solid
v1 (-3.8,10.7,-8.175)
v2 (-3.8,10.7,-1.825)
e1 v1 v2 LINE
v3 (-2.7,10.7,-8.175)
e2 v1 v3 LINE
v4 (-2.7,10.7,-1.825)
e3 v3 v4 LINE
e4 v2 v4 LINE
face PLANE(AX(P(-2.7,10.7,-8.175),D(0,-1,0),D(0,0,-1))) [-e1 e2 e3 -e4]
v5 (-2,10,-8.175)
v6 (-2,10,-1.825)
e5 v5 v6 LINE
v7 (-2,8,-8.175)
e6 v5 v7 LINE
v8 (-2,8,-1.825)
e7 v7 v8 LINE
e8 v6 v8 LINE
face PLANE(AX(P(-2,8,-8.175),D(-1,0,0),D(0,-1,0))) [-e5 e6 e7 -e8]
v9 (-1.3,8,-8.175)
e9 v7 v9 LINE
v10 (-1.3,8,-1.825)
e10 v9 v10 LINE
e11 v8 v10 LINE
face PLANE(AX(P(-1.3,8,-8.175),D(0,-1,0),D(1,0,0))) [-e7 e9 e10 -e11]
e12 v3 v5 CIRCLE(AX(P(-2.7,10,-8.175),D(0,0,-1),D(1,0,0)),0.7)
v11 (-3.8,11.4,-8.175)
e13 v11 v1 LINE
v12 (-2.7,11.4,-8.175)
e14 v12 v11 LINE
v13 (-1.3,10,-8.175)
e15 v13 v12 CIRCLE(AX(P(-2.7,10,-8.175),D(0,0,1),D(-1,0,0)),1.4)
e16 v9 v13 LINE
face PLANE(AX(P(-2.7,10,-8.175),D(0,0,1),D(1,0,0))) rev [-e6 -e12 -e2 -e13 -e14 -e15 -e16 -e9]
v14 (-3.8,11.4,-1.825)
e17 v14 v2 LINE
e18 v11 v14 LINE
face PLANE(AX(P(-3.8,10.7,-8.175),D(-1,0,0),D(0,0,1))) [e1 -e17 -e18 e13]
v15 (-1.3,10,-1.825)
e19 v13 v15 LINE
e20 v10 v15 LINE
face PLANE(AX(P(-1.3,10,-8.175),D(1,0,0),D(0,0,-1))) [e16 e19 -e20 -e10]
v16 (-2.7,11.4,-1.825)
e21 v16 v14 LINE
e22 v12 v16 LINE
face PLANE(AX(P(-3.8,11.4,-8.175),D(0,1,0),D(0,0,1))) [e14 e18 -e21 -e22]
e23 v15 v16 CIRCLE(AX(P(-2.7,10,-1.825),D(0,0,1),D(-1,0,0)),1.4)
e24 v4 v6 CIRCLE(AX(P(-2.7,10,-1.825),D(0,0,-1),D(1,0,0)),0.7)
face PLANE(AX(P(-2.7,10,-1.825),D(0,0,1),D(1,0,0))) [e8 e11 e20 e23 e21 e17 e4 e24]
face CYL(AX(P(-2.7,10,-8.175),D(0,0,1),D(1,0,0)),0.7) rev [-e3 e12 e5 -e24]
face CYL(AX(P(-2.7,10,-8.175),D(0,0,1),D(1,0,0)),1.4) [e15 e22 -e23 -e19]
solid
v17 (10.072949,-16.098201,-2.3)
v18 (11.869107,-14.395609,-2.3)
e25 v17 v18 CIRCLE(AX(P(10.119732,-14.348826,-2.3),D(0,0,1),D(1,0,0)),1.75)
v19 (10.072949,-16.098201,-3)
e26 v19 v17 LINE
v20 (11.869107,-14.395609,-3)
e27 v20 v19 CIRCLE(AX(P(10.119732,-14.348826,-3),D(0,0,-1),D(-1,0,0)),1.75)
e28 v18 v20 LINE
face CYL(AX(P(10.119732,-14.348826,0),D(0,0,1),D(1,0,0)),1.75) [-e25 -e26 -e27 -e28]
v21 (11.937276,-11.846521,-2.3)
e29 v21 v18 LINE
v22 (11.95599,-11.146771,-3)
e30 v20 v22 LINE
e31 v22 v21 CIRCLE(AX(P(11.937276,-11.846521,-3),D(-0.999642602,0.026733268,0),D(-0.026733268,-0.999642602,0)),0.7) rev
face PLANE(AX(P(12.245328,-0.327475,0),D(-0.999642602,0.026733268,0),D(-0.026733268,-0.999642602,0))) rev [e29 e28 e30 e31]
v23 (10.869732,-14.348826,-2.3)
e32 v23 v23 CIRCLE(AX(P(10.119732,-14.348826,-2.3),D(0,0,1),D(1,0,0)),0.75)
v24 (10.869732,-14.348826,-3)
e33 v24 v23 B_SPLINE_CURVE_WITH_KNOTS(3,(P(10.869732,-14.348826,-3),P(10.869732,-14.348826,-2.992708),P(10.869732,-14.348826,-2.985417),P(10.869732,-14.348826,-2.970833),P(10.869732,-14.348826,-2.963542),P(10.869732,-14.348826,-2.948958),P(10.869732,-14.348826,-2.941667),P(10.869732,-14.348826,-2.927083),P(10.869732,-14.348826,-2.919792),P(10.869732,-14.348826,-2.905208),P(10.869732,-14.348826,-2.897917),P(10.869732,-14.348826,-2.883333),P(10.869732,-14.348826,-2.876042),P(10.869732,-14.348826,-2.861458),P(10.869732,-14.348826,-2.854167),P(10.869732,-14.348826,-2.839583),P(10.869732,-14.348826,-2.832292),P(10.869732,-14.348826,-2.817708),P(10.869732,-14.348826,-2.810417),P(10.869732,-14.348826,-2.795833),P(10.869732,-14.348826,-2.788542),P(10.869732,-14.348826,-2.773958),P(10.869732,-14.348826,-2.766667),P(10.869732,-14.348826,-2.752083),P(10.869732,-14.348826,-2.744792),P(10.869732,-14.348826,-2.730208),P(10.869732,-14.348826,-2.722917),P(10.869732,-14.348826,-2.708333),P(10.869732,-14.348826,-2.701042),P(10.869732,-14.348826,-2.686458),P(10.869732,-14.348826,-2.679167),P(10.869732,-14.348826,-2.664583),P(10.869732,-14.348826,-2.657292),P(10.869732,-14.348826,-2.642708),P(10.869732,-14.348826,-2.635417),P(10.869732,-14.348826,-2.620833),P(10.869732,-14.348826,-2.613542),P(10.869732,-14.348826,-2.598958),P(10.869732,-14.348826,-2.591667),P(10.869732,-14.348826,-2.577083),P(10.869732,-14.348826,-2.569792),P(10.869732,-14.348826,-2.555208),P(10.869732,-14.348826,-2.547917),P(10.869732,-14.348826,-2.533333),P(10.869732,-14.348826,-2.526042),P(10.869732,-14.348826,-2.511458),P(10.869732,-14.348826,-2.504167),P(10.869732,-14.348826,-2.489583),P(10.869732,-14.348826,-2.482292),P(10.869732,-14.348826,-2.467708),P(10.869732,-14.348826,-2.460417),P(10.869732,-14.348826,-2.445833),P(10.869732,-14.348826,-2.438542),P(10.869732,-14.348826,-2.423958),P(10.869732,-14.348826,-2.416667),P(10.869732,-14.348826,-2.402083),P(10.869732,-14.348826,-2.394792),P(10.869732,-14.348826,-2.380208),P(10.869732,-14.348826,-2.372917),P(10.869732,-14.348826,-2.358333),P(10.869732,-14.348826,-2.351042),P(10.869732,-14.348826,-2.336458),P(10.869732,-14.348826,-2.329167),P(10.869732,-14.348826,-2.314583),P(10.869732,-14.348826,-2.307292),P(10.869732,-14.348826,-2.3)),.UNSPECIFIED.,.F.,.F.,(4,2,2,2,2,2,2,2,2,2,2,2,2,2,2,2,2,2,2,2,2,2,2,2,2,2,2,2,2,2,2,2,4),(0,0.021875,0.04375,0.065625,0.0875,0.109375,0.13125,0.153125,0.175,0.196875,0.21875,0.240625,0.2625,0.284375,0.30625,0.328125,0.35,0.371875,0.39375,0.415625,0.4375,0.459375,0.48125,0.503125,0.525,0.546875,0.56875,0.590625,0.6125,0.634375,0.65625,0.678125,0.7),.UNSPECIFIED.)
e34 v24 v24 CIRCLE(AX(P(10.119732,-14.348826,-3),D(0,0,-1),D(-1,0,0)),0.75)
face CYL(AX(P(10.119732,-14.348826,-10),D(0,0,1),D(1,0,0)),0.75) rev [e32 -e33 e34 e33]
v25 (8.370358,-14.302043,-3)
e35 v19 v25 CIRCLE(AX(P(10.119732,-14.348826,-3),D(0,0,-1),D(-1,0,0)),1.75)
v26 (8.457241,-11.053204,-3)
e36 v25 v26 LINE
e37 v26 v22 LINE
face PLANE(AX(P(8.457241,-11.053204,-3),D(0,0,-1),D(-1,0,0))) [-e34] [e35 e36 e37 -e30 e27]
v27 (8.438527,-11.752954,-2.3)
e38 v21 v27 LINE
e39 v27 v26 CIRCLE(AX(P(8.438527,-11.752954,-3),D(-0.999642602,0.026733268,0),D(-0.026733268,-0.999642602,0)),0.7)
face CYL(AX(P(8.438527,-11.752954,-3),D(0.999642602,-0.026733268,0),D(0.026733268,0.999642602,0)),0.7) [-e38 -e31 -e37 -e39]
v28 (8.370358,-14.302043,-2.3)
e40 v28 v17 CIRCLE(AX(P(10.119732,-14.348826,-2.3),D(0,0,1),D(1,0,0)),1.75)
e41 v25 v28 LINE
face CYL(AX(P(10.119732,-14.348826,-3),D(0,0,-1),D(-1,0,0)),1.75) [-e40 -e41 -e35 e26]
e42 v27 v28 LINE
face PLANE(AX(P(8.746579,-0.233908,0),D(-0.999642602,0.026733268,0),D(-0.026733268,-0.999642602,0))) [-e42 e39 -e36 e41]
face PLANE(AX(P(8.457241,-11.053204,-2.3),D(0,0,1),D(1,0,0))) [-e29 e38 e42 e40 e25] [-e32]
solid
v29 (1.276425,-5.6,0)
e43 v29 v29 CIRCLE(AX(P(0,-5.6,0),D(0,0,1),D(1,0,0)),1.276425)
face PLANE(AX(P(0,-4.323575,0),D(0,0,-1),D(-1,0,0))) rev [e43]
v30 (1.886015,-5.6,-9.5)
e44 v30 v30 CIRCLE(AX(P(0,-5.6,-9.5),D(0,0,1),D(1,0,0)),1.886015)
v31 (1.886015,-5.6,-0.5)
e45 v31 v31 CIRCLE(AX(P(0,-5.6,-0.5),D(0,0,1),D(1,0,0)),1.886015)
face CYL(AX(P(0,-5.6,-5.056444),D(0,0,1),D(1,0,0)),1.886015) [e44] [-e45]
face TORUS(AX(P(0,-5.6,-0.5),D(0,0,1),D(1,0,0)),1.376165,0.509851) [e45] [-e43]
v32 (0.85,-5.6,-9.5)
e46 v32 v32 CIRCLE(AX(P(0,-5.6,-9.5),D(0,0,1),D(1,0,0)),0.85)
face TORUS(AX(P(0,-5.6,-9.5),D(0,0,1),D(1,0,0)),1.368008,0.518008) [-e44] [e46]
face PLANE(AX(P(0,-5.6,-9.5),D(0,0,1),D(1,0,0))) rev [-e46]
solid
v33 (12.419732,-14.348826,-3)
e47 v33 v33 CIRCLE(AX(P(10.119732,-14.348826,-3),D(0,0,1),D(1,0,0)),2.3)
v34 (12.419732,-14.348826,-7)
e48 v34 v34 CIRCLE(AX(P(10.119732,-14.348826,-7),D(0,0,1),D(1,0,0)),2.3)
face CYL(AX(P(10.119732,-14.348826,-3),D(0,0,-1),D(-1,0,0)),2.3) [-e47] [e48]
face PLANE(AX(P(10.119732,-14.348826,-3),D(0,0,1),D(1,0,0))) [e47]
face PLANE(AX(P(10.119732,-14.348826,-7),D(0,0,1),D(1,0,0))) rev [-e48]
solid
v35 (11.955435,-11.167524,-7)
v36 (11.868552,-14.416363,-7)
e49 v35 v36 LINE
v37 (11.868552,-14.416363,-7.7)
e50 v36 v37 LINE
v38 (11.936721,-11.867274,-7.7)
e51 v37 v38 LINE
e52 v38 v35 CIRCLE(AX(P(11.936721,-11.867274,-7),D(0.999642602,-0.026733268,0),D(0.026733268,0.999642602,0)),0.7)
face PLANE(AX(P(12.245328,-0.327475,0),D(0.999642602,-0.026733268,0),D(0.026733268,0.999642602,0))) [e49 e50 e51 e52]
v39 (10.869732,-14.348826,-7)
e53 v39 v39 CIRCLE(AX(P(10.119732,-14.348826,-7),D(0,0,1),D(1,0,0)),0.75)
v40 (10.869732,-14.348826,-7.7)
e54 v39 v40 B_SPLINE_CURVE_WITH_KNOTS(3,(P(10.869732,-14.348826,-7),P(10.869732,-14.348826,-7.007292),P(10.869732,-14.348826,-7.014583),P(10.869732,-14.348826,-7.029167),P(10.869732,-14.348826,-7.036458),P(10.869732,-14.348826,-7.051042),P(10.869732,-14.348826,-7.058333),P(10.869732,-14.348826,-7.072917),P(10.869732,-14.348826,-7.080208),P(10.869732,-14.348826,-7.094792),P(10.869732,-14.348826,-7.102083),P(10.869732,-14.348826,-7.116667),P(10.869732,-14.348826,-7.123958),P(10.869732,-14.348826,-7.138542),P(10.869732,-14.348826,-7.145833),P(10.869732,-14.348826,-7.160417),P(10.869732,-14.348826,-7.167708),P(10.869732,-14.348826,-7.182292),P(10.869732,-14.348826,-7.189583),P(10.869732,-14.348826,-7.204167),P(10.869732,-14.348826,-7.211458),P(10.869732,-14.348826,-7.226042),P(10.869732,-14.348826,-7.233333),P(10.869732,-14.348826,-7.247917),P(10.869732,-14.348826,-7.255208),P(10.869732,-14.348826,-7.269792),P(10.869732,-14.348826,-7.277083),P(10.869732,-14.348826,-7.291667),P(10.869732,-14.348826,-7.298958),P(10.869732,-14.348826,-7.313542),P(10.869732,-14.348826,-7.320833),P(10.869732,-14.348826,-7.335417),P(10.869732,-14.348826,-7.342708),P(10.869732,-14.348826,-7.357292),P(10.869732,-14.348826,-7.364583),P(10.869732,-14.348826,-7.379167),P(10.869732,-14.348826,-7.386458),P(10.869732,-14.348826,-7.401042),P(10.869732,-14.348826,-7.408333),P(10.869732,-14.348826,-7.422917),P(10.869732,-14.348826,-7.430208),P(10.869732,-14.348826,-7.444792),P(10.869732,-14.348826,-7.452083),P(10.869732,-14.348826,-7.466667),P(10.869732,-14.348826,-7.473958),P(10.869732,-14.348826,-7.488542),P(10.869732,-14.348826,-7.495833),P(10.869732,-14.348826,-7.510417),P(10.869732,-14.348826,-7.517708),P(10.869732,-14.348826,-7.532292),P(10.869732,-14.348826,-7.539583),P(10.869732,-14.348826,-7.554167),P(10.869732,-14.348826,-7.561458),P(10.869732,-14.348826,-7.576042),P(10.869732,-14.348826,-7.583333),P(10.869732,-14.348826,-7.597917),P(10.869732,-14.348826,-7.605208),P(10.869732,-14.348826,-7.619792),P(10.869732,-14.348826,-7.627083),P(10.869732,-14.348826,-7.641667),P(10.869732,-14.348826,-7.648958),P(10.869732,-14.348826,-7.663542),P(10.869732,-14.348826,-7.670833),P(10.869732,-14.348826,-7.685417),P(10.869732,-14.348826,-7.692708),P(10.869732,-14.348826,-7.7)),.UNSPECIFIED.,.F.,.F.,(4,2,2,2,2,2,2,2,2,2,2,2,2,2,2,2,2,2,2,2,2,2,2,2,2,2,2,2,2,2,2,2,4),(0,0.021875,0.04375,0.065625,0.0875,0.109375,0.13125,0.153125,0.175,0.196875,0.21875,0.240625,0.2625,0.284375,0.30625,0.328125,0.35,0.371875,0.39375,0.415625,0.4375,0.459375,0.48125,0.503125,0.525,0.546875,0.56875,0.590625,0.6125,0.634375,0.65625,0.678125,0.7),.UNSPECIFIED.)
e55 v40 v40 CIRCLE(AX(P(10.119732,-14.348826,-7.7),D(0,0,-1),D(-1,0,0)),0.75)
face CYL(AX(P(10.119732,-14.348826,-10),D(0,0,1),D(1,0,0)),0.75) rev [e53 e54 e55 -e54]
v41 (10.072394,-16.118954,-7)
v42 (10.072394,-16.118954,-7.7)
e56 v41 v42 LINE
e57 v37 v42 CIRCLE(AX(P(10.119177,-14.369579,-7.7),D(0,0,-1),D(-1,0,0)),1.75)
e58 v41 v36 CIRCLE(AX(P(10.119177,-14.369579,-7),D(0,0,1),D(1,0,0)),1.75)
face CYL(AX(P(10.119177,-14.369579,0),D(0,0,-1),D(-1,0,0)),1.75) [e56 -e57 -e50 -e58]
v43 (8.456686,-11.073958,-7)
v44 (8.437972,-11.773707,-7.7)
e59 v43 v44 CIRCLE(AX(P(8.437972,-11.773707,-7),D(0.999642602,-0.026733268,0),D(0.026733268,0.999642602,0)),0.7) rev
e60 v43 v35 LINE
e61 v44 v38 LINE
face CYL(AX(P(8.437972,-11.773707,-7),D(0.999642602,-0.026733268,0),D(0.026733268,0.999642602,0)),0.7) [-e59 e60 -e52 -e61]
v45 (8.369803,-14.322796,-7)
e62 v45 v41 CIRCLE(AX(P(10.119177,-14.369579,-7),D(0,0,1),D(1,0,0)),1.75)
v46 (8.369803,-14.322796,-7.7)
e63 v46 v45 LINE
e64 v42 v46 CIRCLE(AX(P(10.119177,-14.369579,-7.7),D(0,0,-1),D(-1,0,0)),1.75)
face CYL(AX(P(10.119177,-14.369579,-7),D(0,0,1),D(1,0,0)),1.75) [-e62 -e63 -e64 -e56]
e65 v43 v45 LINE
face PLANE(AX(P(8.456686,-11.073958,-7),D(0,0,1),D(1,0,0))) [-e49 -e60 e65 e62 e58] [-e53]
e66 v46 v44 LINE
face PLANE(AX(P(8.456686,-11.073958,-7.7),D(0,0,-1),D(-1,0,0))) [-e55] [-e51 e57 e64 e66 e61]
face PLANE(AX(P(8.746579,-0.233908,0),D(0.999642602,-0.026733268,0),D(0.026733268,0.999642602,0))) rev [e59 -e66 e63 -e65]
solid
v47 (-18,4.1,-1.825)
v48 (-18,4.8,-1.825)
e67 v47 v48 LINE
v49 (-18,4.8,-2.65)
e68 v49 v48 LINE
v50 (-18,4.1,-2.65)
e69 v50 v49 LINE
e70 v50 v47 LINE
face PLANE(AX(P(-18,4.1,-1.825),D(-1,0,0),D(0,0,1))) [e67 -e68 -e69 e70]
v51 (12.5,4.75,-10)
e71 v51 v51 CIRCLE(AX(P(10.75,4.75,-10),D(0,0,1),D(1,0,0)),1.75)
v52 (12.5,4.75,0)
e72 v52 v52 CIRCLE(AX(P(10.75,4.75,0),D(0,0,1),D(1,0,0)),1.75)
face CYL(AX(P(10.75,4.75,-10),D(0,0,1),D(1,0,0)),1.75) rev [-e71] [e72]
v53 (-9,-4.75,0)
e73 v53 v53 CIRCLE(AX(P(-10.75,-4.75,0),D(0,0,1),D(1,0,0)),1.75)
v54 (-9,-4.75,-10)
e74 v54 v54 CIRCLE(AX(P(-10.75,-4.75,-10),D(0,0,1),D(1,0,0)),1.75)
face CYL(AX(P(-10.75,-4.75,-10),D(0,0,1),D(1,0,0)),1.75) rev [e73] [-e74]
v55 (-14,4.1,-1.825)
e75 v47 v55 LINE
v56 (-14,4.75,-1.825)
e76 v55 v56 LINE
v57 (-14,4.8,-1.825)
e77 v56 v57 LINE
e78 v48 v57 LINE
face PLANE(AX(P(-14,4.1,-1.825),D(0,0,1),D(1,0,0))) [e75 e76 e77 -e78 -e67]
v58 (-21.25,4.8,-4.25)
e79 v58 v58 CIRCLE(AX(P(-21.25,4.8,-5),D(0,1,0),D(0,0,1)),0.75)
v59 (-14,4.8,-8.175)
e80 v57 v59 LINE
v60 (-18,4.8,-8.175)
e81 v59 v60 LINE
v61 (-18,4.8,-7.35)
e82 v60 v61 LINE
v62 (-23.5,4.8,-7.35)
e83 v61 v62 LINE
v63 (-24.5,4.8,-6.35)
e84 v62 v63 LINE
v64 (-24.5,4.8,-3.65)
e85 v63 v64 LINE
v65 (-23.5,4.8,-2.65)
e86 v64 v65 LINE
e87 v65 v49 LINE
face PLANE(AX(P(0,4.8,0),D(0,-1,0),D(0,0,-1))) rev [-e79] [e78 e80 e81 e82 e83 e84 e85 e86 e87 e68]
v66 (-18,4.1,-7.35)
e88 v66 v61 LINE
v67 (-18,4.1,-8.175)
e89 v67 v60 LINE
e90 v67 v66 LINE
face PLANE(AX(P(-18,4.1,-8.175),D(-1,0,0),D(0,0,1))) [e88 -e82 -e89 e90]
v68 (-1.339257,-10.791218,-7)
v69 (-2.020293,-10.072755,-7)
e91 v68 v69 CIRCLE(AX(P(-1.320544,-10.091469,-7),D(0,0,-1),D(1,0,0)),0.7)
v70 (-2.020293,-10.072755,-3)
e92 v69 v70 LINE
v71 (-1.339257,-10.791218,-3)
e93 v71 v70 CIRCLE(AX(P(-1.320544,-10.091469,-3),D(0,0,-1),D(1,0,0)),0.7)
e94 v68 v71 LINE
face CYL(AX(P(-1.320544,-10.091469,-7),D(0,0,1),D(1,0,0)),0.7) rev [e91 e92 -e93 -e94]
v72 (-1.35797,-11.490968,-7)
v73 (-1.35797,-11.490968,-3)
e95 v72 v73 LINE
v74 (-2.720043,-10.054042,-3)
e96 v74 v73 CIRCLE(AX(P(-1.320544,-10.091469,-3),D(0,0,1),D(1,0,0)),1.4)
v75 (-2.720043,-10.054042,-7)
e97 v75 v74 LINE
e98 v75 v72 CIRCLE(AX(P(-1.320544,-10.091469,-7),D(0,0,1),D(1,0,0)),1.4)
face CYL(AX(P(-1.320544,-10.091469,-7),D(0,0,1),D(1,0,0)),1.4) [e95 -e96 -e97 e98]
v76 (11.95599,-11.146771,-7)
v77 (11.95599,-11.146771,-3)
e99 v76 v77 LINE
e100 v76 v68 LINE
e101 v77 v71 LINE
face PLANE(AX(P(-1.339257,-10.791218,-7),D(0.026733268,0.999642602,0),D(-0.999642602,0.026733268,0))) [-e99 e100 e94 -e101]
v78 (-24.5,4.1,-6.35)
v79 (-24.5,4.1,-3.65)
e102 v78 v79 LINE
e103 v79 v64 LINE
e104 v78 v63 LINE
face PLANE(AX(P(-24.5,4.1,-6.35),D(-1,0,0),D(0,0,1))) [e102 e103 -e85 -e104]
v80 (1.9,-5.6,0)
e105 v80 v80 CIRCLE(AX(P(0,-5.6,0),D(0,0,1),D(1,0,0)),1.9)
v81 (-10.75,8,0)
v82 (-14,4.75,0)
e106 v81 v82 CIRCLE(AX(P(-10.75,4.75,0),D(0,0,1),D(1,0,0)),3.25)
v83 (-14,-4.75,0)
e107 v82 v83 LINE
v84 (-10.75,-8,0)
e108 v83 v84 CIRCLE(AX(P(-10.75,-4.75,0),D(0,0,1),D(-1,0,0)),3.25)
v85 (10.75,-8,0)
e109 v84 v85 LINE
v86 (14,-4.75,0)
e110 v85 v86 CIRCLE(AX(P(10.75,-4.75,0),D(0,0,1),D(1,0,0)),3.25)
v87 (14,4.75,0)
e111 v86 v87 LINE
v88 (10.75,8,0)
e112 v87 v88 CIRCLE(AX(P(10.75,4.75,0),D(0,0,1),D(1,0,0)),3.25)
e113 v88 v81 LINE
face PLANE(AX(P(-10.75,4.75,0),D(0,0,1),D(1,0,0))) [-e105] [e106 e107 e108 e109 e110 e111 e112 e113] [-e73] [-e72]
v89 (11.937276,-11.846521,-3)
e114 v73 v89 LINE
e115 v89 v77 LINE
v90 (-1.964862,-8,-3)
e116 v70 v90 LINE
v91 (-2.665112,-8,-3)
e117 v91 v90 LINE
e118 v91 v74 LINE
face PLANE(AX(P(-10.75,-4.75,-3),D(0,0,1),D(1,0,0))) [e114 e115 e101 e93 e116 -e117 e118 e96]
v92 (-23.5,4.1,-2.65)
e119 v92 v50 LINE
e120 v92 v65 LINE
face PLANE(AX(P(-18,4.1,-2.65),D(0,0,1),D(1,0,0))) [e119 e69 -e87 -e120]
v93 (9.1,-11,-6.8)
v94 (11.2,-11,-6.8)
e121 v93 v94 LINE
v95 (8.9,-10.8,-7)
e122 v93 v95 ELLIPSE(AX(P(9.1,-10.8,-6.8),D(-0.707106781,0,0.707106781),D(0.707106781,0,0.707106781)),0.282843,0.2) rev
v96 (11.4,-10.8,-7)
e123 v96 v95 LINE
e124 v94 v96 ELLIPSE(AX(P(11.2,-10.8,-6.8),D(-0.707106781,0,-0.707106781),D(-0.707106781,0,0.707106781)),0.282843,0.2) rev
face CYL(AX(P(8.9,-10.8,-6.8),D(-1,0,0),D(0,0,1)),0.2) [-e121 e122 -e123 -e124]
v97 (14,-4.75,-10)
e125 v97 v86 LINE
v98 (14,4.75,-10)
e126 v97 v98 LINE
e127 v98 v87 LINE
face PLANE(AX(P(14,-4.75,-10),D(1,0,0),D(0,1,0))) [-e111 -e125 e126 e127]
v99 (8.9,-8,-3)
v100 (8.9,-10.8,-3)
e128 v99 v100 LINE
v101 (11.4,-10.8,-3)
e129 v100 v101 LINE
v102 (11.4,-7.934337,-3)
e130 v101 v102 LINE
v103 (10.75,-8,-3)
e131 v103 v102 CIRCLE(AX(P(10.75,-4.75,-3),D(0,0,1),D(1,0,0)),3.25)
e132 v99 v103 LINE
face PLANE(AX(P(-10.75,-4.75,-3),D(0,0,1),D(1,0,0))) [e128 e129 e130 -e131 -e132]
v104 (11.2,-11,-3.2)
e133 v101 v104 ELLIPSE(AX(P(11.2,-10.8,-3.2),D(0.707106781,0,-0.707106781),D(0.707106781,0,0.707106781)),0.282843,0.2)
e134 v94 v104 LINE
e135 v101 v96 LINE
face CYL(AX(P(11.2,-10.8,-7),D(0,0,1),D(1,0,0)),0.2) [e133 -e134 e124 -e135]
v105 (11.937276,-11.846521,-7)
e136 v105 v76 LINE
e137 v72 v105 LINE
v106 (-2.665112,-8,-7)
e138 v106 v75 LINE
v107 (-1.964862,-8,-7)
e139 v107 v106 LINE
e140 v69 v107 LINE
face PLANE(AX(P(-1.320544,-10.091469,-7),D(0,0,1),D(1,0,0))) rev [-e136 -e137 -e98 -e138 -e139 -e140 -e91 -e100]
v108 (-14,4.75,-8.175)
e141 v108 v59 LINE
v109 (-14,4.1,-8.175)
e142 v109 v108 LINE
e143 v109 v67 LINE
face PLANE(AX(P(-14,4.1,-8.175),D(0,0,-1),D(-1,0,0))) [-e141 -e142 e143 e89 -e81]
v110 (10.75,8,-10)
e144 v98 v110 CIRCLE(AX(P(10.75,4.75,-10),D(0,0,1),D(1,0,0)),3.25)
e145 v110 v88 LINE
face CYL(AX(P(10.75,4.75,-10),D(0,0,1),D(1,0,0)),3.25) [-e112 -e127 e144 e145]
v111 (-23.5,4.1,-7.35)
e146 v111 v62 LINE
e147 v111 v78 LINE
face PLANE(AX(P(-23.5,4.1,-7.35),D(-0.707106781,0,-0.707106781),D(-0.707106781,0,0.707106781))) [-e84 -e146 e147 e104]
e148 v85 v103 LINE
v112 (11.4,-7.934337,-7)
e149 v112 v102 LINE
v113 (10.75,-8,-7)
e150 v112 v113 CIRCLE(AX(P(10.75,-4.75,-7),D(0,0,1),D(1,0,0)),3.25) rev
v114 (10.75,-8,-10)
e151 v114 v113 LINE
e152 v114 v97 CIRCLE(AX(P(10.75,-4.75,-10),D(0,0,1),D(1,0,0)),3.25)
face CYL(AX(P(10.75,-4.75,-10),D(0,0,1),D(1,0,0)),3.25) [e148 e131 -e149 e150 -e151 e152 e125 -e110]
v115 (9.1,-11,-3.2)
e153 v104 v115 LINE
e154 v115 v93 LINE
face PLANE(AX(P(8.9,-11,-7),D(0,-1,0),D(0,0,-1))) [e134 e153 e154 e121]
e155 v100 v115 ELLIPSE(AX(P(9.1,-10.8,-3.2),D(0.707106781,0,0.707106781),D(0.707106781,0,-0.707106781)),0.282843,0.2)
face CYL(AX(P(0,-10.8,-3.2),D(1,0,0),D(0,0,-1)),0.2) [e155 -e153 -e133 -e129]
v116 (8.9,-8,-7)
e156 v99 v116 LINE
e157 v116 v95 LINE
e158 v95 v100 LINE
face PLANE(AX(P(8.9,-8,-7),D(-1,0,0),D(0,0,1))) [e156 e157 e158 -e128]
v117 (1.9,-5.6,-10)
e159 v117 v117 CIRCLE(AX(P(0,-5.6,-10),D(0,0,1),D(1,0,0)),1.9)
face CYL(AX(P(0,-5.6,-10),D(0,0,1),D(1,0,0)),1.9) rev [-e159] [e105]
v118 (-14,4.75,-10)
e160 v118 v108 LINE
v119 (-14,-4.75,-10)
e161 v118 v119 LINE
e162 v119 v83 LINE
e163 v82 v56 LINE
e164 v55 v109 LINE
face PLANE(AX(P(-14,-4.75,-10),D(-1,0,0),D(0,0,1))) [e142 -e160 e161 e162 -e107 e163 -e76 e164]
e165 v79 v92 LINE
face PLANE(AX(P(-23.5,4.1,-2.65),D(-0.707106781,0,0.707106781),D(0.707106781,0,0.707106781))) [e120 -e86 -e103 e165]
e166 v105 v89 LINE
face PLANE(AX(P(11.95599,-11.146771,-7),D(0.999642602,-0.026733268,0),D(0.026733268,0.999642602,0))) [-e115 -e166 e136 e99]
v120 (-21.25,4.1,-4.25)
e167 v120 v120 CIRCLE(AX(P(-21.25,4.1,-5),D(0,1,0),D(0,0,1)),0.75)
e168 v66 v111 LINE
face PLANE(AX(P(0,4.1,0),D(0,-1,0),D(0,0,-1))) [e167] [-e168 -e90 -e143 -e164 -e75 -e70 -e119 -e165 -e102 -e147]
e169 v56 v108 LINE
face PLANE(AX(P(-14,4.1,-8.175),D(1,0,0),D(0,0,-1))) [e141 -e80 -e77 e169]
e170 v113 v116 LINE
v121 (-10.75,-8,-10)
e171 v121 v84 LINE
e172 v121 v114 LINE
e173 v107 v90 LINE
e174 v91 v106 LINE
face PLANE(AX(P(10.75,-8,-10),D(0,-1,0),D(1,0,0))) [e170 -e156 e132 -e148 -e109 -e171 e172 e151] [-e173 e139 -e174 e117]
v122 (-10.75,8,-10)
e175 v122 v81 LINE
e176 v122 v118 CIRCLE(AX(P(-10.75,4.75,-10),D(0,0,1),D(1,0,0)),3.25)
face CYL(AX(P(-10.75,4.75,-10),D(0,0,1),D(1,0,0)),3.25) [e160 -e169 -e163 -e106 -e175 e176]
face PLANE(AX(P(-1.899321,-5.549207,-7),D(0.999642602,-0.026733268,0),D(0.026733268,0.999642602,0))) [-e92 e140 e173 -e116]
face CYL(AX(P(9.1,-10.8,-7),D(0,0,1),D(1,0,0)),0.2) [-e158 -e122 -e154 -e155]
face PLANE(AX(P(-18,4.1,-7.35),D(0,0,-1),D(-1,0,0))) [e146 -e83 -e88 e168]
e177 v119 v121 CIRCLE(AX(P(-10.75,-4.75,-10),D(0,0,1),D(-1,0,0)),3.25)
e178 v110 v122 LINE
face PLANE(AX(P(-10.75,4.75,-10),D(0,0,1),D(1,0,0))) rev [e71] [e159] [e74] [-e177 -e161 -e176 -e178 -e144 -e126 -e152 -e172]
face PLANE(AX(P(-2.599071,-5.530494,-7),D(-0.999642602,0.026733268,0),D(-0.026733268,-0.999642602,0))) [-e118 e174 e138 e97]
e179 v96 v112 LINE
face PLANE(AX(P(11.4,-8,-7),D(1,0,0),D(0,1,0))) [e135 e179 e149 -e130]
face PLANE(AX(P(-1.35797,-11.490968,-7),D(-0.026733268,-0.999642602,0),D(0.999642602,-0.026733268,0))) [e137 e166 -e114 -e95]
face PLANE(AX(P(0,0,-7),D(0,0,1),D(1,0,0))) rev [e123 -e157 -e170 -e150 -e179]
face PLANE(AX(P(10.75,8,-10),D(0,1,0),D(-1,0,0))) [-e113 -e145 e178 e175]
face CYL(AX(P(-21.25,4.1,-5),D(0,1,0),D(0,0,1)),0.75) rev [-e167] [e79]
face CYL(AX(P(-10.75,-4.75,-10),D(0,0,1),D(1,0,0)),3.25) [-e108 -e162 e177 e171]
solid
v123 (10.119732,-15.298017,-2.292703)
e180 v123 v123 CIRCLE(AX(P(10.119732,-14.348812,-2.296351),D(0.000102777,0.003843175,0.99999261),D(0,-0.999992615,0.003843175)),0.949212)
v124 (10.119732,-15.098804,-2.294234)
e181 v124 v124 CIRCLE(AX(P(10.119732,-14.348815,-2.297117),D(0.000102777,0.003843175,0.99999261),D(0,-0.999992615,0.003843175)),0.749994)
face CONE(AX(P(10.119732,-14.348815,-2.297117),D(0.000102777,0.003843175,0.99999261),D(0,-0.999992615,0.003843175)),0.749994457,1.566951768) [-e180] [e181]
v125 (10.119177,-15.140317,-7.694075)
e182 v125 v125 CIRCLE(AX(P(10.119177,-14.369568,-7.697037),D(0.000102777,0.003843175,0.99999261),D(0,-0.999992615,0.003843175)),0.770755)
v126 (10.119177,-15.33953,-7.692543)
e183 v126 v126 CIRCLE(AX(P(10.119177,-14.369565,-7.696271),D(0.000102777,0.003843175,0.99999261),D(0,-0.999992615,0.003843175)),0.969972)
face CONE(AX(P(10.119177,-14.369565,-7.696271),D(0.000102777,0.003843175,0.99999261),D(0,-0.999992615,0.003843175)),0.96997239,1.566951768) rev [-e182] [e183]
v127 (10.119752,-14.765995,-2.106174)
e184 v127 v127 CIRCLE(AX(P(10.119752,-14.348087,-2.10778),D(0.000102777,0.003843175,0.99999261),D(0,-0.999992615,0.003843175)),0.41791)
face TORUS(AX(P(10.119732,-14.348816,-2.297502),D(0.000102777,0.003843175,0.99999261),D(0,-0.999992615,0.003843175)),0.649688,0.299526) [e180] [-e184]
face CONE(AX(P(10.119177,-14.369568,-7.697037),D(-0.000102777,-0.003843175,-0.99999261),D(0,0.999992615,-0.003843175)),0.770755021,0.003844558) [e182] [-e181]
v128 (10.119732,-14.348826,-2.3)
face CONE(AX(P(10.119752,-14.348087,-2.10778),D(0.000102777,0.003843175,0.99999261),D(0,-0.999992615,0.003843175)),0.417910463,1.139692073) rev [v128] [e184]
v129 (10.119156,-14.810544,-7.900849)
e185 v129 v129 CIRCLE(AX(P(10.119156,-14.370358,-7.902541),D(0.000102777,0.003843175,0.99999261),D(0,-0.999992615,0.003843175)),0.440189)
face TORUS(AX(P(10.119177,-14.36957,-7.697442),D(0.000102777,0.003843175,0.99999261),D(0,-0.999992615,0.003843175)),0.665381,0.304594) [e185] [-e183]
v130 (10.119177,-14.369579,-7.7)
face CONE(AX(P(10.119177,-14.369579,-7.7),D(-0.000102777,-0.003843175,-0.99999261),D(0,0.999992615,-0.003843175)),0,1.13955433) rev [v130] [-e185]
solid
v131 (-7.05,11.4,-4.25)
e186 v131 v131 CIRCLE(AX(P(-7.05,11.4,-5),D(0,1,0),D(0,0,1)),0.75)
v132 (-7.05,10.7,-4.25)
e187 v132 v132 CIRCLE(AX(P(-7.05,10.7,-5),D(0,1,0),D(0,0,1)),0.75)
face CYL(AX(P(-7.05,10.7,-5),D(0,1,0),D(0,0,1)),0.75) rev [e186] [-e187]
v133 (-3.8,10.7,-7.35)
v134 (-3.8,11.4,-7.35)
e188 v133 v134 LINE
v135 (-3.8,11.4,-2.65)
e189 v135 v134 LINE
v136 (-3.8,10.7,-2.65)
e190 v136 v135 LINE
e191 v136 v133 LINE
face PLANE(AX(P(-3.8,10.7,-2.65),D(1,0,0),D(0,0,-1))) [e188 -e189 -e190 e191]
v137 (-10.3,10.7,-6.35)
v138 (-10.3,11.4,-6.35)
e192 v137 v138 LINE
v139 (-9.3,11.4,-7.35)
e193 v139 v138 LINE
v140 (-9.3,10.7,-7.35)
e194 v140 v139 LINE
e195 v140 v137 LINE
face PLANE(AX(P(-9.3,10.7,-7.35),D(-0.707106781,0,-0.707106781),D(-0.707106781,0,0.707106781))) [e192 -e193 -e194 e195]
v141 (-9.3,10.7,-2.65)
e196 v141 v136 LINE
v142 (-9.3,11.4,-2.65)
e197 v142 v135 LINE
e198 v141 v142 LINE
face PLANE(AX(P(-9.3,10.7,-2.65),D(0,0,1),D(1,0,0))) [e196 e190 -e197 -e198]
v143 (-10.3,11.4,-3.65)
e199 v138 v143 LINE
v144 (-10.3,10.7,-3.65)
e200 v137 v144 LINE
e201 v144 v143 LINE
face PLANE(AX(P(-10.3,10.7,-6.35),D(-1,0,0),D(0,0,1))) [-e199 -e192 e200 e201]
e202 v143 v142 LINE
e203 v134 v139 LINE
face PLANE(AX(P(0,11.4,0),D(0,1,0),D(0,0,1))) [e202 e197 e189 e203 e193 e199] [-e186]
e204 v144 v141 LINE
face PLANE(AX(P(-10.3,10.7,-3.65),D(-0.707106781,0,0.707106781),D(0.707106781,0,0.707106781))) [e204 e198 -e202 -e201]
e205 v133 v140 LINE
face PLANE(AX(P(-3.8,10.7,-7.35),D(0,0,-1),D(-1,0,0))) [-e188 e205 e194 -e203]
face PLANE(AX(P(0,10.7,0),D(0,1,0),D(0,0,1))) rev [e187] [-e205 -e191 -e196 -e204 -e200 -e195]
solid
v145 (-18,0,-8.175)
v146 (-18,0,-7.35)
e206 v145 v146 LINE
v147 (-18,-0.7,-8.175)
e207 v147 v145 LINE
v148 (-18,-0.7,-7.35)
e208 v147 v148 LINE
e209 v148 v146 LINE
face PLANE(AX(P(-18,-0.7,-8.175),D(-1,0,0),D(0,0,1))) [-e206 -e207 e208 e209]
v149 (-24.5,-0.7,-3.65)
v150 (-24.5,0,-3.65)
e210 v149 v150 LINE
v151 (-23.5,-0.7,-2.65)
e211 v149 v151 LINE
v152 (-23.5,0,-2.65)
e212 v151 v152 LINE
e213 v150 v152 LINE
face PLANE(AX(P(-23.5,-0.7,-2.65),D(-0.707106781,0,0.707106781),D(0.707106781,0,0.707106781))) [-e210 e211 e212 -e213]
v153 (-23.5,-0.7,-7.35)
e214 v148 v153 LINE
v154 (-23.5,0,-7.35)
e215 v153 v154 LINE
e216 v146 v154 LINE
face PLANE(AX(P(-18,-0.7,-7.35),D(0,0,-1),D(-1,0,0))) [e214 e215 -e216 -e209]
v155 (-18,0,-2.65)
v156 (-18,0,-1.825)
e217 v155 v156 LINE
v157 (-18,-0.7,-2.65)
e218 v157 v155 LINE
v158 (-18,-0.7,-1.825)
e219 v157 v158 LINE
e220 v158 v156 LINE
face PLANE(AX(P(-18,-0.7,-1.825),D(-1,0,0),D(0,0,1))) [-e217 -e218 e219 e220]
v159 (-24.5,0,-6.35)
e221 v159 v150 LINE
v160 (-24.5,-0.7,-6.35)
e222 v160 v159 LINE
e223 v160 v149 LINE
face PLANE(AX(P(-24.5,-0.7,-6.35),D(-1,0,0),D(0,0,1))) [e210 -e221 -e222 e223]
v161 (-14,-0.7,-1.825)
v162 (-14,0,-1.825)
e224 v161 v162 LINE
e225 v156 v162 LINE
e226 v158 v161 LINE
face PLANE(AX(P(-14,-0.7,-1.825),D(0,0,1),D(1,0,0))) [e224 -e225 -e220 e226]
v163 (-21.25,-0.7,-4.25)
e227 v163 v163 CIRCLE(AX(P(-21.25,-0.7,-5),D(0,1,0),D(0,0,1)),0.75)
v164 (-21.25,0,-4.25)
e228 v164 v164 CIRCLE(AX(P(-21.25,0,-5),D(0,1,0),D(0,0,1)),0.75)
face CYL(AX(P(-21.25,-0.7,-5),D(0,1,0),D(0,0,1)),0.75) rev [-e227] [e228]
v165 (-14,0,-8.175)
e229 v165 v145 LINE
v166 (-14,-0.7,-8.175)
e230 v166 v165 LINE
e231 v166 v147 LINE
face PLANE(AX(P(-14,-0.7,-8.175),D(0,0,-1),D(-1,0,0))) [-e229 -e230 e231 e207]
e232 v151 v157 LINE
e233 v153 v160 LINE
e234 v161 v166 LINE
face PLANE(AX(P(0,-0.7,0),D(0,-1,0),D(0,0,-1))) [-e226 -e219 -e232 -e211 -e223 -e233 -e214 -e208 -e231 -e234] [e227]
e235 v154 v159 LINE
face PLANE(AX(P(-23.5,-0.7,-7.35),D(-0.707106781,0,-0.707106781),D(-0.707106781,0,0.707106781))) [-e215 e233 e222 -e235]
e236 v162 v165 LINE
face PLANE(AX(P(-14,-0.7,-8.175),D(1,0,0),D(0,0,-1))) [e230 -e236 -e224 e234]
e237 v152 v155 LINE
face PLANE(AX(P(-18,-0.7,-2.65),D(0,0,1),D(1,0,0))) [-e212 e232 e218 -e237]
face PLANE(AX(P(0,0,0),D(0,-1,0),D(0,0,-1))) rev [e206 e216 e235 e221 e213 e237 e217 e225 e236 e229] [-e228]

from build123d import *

# Parameters (mm, degrees)
ESQUISSE1_R                = 1.75
ESQUISSE1_R_2              = 1.9
BOSS_EXTRU_1_DEPTH         = 10
ENL_V_MAT_EXTRU_1_DEPTH    = 3
BOSS_EXTRU_6_DEPTH         = 4
CONG_1_R                   = 0.2
BOSS_EXTRU_7_DEPTH         = 4
ESQUISSE11_W               = 0.7
ESQUISSE11_H               = 5
BOSS_EXTRU_8_DEPTH         = 3.5
BOSS_EXTRU_8_2_DEPTH       = 3.5
CONG_2_R                   = 1.75
CONG_3_R                   = 1.75
CONG_4_R                   = 0.7
CONG_5_R                   = 0.7
ESQUISSE12_R               = 0.75
ENL_V_MAT_EXTRU_2_DEPTH    = 23.696495837
ESQUISSE13_R               = 2.3
BOSS_EXTRU_9_DEPTH         = 4
ESQUISSE3_R                = 1.9
BOSS_EXTRU_2_DEPTH         = 3
ESQUISSE6_R                = 0.75
BOSS_EXTRU_3_DEPTH         = 0.7
R_P_TITION_LIN_AIRE1_COUNT = 2
R_P_TITION_LIN_AIRE1_PITCH = 4.8
BOSS_EXTRU_4_DEPTH         = 6.35
ESQUISSE8_R                = 0.75
BOSS_EXTRU_5_DEPTH         = 0.7


with BuildPart() as part:
    # Esquisse1 → Boss.-Extru.1 (new body)
    with BuildSketch(Plane.XY):
        with BuildLine():
            Line((10.75, -8), (-10.75, -8))
            ThreePointArc((-10.75, -8), (-13.048097039, -7.048097039), (-14, -4.75))
            Line((-14, -4.75), (-14, 4.75))
            ThreePointArc((-14, 4.75), (-13.048097039, 7.048097039), (-10.75, 8))
            Line((-10.75, 8), (10.75, 8))
            ThreePointArc((10.75, 8), (13.048097039, 7.048097039), (14, 4.75))
            Line((14, 4.75), (14, -4.75))
            ThreePointArc((14, -4.75), (13.048097039, -7.048097039), (10.75, -8))
        make_face()
        with Locations((10.75, 4.75)):
            Circle(ESQUISSE1_R, mode=Mode.SUBTRACT)
        with Locations((-10.75, -4.75)):
            Circle(ESQUISSE1_R, mode=Mode.SUBTRACT)
        with Locations((0, -5.6)):
            Circle(ESQUISSE1_R_2, mode=Mode.SUBTRACT)
    extrude(amount=-BOSS_EXTRU_1_DEPTH)

    # Esquisse2 → Enlèv. mat.-Extru.1 (cut)
    with BuildSketch(Plane.XY):
        with BuildLine():
            Line((-10.75, 8), (8.5, 8))
            Line((8.5, 8), (8.5, 4.75))
            ThreePointArc((8.5, 4.75), (9.159009742, 3.159009742), (10.75, 2.5))
            Line((10.75, 2.5), (14, 2.5))
            Line((14, 2.5), (14, -4.75))
            ThreePointArc((14, -4.75), (13.048097039, -7.048097039), (10.75, -8))
            Line((10.75, -8), (-8.5, -8))
            Line((-8.5, -8), (-8.5, -4.75))
            ThreePointArc((-8.5, -4.75), (-9.159009742, -3.159009742), (-10.75, -2.5))
            Line((-10.75, -2.5), (-14, -2.5))
            Line((-14, -2.5), (-14, 4.75))
            ThreePointArc((-14, 4.75), (-13.048097039, 7.048097039), (-10.75, 8))
        make_face()
    extrude(amount=-ENL_V_MAT_EXTRU_1_DEPTH, mode=Mode.SUBTRACT)



with BuildPart() as body_2:
    # Esquisse9 → Boss.-Extru.6 (new body)
    with BuildSketch(Plane.XY.offset(-3)):
        Polygon((8.9, -8), (8.9, -11), (11.4, -11), (11.4, -8), (11.4, -7), (8.9, -7), align=None)
    extrude(amount=-BOSS_EXTRU_6_DEPTH)

    # Congé1
    cong_1_edges = [body_2.edges().sort_by_distance(p)[0] for p in [
        (10.15, -11, -7),
        (11.4, -11, -5),
        (8.9, -11, -5),
        (10.15, -11, -3),
    ]]
    fillet(cong_1_edges, radius=CONG_1_R)


with BuildPart() as part_1:
    add(part.part)

    add(body_2.part)  # Boss.-Extru.7 merges body 2
    # Esquisse10 → Boss.-Extru.7 (add)
    with BuildSketch(Plane.XY.offset(-3)):
        with BuildLine():
            Line((-1.899320944, -5.549206791), (-2.020293411, -10.072755239))
            ThreePointArc((-2.020293411, -10.072755239), (-1.828573726, -10.573034078), (-1.339256877, -10.791218348))
            Line((-1.339256877, -10.791218348), (11.955989734, -11.146770808))
            Line((11.955989734, -11.146770808), (11.937276447, -11.846520629))
            Line((11.937276447, -11.846520629), (-1.357970164, -11.490968169))
            ThreePointArc((-1.357970164, -11.490968169), (-2.336603862, -11.054599629), (-2.720043233, -10.054041951))
            Line((-2.720043233, -10.054041951), (-2.599070766, -5.530493504))
            Line((-2.599070766, -5.530493504), (-1.899320944, -5.549206791))
        make_face()
    extrude(amount=-BOSS_EXTRU_7_DEPTH)


with BuildPart() as body_2_2:
    # Esquisse11 → Boss.-Extru.8 (new body)
    with BuildSketch(Plane(origin=(12.245328283, -0.327474678, 0), x_dir=(0, 0, -1), z_dir=(0.9996426023327817, -0.026733267689230993, 0))):
        with Locations((2.65, -13.323164304)):
            Rectangle(ESQUISSE11_W, ESQUISSE11_H)
    extrude(amount=-BOSS_EXTRU_8_DEPTH)

    # Congé2
    cong_2_edges = [body_2_2.edges().sort_by_distance(p)[0] for p in [
        (8.323574287, -16.051417383, -2.65),
        (11.822323396, -16.14498382, -2.65),
    ]]
    fillet(cong_2_edges, radius=CONG_2_R - 0.0001)  # a hair under: the kernel refuses the full size

    # Congé4
    cong_4_edges = [body_2_2.edges().sort_by_distance(p)[0] for p in [
        (10.20661518, -11.099987589, -2.3),
    ]]
    fillet(cong_4_edges, radius=CONG_4_R - 0.0001)  # a hair under: the kernel refuses the full size


with BuildPart() as body_3:
    # Esquisse11 → Boss.-Extru.8 2 (new body)
    with BuildSketch(Plane(origin=(12.245328283, -0.327474678, 0), x_dir=(0, 0, -1), z_dir=(0.9996426023327817, -0.026733267689230993, 0))):
        with Locations((7.35, -13.343925022)):
            Rectangle(ESQUISSE11_W, ESQUISSE11_H)
    extrude(amount=-BOSS_EXTRU_8_2_DEPTH)

    # Congé3
    cong_3_edges = [body_3.edges().sort_by_distance(p)[0] for p in [
        (11.821768394, -16.165737117, -7.35),
        (8.323019286, -16.07217068, -7.35),
    ]]
    fillet(cong_3_edges, radius=CONG_3_R - 0.0001)  # a hair under: the kernel refuses the full size

    # Congé5
    cong_5_edges = [body_3.edges().sort_by_distance(p)[0] for p in [
        (10.206060178, -11.120740887, -7.7),
    ]]
    fillet(cong_5_edges, radius=CONG_5_R - 0.0001)  # a hair under: the kernel refuses the full size


with BuildPart() as enl_v_mat_extru_2_tool:
    # Esquisse12 → Enlèv. mat.-Extru.2 (new, through all)
    with BuildSketch(Plane.XY.offset(-2.3)):
        with Locations((10.11973206, -14.348826047)):
            Circle(ESQUISSE12_R)
    extrude(amount=-ENL_V_MAT_EXTRU_2_DEPTH)


with BuildPart() as body_2_2_1:
    add(body_2_2.part)

    # Enlèv. mat.-Extru.2: cut by enl_v_mat_extru_2_tool
    add(enl_v_mat_extru_2_tool.part, mode=Mode.SUBTRACT)


with BuildPart() as body_3_1:
    add(body_3.part)

    # Enlèv. mat.-Extru.2: cut by enl_v_mat_extru_2_tool
    add(enl_v_mat_extru_2_tool.part, mode=Mode.SUBTRACT)


with BuildPart() as body_4:
    # Esquisse13 → Boss.-Extru.9 (new body)
    with BuildSketch(Plane.XY.offset(-7)):
        with Locations((10.11973206, -14.348826047)):
            Circle(ESQUISSE13_R)
    extrude(amount=BOSS_EXTRU_9_DEPTH)


with BuildPart() as body_5:
    # Esquisse14 → Révolution3 (revolve)
    with BuildSketch(Plane(origin=(10.495953729, -0.280691459, 0), x_dir=(0, 0, -1), z_dir=(0.9996426023327817, -0.026733267689230993, 0)), mode=Mode.PRIVATE) as r_volution3_sk:
        with BuildLine():
            Line((2.3, -13.323164304), (7.7, -13.323164304))
            Line((7.7, -13.323164304), (7.7, -13.123945463))
            ThreePointArc((7.7, -13.123945463), (7.984261411, -13.319118763), (7.904232859, -13.654517925))
            Line((7.904232859, -13.654517925), (7.7, -14.093925022))
            Line((7.7, -14.093925022), (2.3, -14.073164304))
            Line((2.3, -14.073164304), (2.109386747, -13.654517925))
            ThreePointArc((2.109386747, -13.654517925), (2.018113254, -13.322200994), (2.3, -13.123945463))
            Line((2.3, -13.123945463), (2.3, -13.323164304))
        make_face()
    revolve(r_volution3_sk.sketch.rotate(Axis((10.11973206, -14.348826047, -2.3), (-0.00010277735549151781, -0.003843174889761963, -0.9999926096944827)), 178.468125403), axis=Axis((10.11973206, -14.348826047, -2.3), (-0.00010277735549151781, -0.003843174889761963, -0.9999926096944827)))


with BuildPart() as body_6:
    # Esquisse3 → Boss.-Extru.2 (new body)
    with BuildSketch(Plane.XY.offset(-3)):
        with BuildLine():
            Line((-14, 4.75), (-14, -2.5))
            Line((-14, -2.5), (-10.75, -2.5))
            ThreePointArc((-10.75, -2.5), (-9.159009742, -3.159009742), (-8.5, -4.75))
            Line((-8.5, -4.75), (-8.5, -8))
            Line((-8.5, -8), (10.75, -8))
            ThreePointArc((10.75, -8), (13.048097039, -7.048097039), (14, -4.75))
            Line((14, -4.75), (14, 2.5))
            Line((14, 2.5), (10.75, 2.5))
            ThreePointArc((10.75, 2.5), (9.159009742, 3.159009742), (8.5, 4.75))
            Line((8.5, 4.75), (8.5, 8))
            Line((8.5, 8), (-10.75, 8))
            ThreePointArc((-10.75, 8), (-13.048097039, 7.048097039), (-14, 4.75))
        make_face()
        with Locations((0, -5.6)):
            Circle(ESQUISSE3_R, mode=Mode.SUBTRACT)
    extrude(amount=BOSS_EXTRU_2_DEPTH)


with BuildPart() as body_7:
    # Esquisse5 → Révolution1 (revolve)
    with BuildSketch(Plane(origin=(0, 0, 0), x_dir=(0, 0, -1), z_dir=(1, 0, 0)), mode=Mode.PRIVATE) as r_volution1_sk:
        with BuildLine():
            Line((0.5, -3.713984525), (9.5, -3.713984525))
            ThreePointArc((9.5, -3.713984525), (10.018007737, -4.231992263), (9.5, -4.75))
            Line((9.5, -4.75), (9.5, -5.6))
            Line((9.5, -5.6), (0, -5.6))
            Line((0, -5.6), (0, -4.32357469))
            ThreePointArc((0, -4.32357469), (0.105791879, -3.900496761), (0.5, -3.713984525))
        make_face()
    revolve(r_volution1_sk.sketch.rotate(Axis((0, -5.6, -5.056443534), (0, 0, -1)), 90), axis=Axis((0, -5.6, -5.056443534), (0, 0, -1)))


with BuildPart() as body_8:
    # Esquisse6 → Boss.-Extru.3 (new body)
    with BuildSketch(Plane(origin=(0, 0, 0), x_dir=(1, 0, 0), z_dir=(0, 1, 0))):
        Polygon((-14, 8.175), (-18, 8.175), (-18, 7.35), (-23.5, 7.35), (-24.5, 6.35), (-24.5, 3.65), (-23.5, 2.65), (-18, 2.65), (-18, 1.825), (-14, 1.825), align=None)
        with Locations(Location((-21.25, 5, 0), (0, 0, 270))):
            Circle(ESQUISSE6_R, mode=Mode.SUBTRACT)
    boss_extru_3 = extrude(amount=-BOSS_EXTRU_3_DEPTH)


with BuildPart() as part_2:
    add(part_1.part)

    add(body_6.part)  # Répétition linéaire1 merges body 6
    # Répétition linéaire1: Boss.-Extru.3 ×2
    with Locations(*[(0, i * R_P_TITION_LIN_AIRE1_PITCH, 0) for i in range(1, R_P_TITION_LIN_AIRE1_COUNT)]):
        add(boss_extru_3)


with BuildPart() as body_8_2:
    # Esquisse7 → Boss.-Extru.4 (new body)
    with BuildSketch(Plane.XY.offset(-1.825)):
        with BuildLine():
            Line((-2, 8), (-2, 10))
            ThreePointArc((-2, 10), (-2.205025253, 10.494974747), (-2.7, 10.7))
            Line((-2.7, 10.7), (-3.8, 10.7))
            Line((-3.8, 10.7), (-3.8, 11.4))
            Line((-3.8, 11.4), (-2.7, 11.4))
            ThreePointArc((-2.7, 11.4), (-1.710050506, 10.989949494), (-1.3, 10))
            Line((-1.3, 10), (-1.3, 8))
            Line((-1.3, 8), (-2, 8))
        make_face()
    extrude(amount=-BOSS_EXTRU_4_DEPTH)


with BuildPart() as body_9:
    # Esquisse8 → Boss.-Extru.5 (new body)
    with BuildSketch(Plane(origin=(0, 11.4, 0), x_dir=(1, 0, 0), z_dir=(0, 1, 0))):
        Polygon((-3.8, 7.35), (-9.3, 7.35), (-10.3, 6.35), (-10.3, 3.65), (-9.3, 2.65), (-3.8, 2.65), align=None)
        with Locations(Location((-7.05, 5, 0), (0, 0, 270))):
            Circle(ESQUISSE8_R, mode=Mode.SUBTRACT)
    extrude(amount=-BOSS_EXTRU_5_DEPTH)


solid = Compound([body_2_2_1.part, body_3_1.part, body_4.part, body_5.part, body_7.part, body_8.part, part_2.part, body_8_2.part, body_9.part])
